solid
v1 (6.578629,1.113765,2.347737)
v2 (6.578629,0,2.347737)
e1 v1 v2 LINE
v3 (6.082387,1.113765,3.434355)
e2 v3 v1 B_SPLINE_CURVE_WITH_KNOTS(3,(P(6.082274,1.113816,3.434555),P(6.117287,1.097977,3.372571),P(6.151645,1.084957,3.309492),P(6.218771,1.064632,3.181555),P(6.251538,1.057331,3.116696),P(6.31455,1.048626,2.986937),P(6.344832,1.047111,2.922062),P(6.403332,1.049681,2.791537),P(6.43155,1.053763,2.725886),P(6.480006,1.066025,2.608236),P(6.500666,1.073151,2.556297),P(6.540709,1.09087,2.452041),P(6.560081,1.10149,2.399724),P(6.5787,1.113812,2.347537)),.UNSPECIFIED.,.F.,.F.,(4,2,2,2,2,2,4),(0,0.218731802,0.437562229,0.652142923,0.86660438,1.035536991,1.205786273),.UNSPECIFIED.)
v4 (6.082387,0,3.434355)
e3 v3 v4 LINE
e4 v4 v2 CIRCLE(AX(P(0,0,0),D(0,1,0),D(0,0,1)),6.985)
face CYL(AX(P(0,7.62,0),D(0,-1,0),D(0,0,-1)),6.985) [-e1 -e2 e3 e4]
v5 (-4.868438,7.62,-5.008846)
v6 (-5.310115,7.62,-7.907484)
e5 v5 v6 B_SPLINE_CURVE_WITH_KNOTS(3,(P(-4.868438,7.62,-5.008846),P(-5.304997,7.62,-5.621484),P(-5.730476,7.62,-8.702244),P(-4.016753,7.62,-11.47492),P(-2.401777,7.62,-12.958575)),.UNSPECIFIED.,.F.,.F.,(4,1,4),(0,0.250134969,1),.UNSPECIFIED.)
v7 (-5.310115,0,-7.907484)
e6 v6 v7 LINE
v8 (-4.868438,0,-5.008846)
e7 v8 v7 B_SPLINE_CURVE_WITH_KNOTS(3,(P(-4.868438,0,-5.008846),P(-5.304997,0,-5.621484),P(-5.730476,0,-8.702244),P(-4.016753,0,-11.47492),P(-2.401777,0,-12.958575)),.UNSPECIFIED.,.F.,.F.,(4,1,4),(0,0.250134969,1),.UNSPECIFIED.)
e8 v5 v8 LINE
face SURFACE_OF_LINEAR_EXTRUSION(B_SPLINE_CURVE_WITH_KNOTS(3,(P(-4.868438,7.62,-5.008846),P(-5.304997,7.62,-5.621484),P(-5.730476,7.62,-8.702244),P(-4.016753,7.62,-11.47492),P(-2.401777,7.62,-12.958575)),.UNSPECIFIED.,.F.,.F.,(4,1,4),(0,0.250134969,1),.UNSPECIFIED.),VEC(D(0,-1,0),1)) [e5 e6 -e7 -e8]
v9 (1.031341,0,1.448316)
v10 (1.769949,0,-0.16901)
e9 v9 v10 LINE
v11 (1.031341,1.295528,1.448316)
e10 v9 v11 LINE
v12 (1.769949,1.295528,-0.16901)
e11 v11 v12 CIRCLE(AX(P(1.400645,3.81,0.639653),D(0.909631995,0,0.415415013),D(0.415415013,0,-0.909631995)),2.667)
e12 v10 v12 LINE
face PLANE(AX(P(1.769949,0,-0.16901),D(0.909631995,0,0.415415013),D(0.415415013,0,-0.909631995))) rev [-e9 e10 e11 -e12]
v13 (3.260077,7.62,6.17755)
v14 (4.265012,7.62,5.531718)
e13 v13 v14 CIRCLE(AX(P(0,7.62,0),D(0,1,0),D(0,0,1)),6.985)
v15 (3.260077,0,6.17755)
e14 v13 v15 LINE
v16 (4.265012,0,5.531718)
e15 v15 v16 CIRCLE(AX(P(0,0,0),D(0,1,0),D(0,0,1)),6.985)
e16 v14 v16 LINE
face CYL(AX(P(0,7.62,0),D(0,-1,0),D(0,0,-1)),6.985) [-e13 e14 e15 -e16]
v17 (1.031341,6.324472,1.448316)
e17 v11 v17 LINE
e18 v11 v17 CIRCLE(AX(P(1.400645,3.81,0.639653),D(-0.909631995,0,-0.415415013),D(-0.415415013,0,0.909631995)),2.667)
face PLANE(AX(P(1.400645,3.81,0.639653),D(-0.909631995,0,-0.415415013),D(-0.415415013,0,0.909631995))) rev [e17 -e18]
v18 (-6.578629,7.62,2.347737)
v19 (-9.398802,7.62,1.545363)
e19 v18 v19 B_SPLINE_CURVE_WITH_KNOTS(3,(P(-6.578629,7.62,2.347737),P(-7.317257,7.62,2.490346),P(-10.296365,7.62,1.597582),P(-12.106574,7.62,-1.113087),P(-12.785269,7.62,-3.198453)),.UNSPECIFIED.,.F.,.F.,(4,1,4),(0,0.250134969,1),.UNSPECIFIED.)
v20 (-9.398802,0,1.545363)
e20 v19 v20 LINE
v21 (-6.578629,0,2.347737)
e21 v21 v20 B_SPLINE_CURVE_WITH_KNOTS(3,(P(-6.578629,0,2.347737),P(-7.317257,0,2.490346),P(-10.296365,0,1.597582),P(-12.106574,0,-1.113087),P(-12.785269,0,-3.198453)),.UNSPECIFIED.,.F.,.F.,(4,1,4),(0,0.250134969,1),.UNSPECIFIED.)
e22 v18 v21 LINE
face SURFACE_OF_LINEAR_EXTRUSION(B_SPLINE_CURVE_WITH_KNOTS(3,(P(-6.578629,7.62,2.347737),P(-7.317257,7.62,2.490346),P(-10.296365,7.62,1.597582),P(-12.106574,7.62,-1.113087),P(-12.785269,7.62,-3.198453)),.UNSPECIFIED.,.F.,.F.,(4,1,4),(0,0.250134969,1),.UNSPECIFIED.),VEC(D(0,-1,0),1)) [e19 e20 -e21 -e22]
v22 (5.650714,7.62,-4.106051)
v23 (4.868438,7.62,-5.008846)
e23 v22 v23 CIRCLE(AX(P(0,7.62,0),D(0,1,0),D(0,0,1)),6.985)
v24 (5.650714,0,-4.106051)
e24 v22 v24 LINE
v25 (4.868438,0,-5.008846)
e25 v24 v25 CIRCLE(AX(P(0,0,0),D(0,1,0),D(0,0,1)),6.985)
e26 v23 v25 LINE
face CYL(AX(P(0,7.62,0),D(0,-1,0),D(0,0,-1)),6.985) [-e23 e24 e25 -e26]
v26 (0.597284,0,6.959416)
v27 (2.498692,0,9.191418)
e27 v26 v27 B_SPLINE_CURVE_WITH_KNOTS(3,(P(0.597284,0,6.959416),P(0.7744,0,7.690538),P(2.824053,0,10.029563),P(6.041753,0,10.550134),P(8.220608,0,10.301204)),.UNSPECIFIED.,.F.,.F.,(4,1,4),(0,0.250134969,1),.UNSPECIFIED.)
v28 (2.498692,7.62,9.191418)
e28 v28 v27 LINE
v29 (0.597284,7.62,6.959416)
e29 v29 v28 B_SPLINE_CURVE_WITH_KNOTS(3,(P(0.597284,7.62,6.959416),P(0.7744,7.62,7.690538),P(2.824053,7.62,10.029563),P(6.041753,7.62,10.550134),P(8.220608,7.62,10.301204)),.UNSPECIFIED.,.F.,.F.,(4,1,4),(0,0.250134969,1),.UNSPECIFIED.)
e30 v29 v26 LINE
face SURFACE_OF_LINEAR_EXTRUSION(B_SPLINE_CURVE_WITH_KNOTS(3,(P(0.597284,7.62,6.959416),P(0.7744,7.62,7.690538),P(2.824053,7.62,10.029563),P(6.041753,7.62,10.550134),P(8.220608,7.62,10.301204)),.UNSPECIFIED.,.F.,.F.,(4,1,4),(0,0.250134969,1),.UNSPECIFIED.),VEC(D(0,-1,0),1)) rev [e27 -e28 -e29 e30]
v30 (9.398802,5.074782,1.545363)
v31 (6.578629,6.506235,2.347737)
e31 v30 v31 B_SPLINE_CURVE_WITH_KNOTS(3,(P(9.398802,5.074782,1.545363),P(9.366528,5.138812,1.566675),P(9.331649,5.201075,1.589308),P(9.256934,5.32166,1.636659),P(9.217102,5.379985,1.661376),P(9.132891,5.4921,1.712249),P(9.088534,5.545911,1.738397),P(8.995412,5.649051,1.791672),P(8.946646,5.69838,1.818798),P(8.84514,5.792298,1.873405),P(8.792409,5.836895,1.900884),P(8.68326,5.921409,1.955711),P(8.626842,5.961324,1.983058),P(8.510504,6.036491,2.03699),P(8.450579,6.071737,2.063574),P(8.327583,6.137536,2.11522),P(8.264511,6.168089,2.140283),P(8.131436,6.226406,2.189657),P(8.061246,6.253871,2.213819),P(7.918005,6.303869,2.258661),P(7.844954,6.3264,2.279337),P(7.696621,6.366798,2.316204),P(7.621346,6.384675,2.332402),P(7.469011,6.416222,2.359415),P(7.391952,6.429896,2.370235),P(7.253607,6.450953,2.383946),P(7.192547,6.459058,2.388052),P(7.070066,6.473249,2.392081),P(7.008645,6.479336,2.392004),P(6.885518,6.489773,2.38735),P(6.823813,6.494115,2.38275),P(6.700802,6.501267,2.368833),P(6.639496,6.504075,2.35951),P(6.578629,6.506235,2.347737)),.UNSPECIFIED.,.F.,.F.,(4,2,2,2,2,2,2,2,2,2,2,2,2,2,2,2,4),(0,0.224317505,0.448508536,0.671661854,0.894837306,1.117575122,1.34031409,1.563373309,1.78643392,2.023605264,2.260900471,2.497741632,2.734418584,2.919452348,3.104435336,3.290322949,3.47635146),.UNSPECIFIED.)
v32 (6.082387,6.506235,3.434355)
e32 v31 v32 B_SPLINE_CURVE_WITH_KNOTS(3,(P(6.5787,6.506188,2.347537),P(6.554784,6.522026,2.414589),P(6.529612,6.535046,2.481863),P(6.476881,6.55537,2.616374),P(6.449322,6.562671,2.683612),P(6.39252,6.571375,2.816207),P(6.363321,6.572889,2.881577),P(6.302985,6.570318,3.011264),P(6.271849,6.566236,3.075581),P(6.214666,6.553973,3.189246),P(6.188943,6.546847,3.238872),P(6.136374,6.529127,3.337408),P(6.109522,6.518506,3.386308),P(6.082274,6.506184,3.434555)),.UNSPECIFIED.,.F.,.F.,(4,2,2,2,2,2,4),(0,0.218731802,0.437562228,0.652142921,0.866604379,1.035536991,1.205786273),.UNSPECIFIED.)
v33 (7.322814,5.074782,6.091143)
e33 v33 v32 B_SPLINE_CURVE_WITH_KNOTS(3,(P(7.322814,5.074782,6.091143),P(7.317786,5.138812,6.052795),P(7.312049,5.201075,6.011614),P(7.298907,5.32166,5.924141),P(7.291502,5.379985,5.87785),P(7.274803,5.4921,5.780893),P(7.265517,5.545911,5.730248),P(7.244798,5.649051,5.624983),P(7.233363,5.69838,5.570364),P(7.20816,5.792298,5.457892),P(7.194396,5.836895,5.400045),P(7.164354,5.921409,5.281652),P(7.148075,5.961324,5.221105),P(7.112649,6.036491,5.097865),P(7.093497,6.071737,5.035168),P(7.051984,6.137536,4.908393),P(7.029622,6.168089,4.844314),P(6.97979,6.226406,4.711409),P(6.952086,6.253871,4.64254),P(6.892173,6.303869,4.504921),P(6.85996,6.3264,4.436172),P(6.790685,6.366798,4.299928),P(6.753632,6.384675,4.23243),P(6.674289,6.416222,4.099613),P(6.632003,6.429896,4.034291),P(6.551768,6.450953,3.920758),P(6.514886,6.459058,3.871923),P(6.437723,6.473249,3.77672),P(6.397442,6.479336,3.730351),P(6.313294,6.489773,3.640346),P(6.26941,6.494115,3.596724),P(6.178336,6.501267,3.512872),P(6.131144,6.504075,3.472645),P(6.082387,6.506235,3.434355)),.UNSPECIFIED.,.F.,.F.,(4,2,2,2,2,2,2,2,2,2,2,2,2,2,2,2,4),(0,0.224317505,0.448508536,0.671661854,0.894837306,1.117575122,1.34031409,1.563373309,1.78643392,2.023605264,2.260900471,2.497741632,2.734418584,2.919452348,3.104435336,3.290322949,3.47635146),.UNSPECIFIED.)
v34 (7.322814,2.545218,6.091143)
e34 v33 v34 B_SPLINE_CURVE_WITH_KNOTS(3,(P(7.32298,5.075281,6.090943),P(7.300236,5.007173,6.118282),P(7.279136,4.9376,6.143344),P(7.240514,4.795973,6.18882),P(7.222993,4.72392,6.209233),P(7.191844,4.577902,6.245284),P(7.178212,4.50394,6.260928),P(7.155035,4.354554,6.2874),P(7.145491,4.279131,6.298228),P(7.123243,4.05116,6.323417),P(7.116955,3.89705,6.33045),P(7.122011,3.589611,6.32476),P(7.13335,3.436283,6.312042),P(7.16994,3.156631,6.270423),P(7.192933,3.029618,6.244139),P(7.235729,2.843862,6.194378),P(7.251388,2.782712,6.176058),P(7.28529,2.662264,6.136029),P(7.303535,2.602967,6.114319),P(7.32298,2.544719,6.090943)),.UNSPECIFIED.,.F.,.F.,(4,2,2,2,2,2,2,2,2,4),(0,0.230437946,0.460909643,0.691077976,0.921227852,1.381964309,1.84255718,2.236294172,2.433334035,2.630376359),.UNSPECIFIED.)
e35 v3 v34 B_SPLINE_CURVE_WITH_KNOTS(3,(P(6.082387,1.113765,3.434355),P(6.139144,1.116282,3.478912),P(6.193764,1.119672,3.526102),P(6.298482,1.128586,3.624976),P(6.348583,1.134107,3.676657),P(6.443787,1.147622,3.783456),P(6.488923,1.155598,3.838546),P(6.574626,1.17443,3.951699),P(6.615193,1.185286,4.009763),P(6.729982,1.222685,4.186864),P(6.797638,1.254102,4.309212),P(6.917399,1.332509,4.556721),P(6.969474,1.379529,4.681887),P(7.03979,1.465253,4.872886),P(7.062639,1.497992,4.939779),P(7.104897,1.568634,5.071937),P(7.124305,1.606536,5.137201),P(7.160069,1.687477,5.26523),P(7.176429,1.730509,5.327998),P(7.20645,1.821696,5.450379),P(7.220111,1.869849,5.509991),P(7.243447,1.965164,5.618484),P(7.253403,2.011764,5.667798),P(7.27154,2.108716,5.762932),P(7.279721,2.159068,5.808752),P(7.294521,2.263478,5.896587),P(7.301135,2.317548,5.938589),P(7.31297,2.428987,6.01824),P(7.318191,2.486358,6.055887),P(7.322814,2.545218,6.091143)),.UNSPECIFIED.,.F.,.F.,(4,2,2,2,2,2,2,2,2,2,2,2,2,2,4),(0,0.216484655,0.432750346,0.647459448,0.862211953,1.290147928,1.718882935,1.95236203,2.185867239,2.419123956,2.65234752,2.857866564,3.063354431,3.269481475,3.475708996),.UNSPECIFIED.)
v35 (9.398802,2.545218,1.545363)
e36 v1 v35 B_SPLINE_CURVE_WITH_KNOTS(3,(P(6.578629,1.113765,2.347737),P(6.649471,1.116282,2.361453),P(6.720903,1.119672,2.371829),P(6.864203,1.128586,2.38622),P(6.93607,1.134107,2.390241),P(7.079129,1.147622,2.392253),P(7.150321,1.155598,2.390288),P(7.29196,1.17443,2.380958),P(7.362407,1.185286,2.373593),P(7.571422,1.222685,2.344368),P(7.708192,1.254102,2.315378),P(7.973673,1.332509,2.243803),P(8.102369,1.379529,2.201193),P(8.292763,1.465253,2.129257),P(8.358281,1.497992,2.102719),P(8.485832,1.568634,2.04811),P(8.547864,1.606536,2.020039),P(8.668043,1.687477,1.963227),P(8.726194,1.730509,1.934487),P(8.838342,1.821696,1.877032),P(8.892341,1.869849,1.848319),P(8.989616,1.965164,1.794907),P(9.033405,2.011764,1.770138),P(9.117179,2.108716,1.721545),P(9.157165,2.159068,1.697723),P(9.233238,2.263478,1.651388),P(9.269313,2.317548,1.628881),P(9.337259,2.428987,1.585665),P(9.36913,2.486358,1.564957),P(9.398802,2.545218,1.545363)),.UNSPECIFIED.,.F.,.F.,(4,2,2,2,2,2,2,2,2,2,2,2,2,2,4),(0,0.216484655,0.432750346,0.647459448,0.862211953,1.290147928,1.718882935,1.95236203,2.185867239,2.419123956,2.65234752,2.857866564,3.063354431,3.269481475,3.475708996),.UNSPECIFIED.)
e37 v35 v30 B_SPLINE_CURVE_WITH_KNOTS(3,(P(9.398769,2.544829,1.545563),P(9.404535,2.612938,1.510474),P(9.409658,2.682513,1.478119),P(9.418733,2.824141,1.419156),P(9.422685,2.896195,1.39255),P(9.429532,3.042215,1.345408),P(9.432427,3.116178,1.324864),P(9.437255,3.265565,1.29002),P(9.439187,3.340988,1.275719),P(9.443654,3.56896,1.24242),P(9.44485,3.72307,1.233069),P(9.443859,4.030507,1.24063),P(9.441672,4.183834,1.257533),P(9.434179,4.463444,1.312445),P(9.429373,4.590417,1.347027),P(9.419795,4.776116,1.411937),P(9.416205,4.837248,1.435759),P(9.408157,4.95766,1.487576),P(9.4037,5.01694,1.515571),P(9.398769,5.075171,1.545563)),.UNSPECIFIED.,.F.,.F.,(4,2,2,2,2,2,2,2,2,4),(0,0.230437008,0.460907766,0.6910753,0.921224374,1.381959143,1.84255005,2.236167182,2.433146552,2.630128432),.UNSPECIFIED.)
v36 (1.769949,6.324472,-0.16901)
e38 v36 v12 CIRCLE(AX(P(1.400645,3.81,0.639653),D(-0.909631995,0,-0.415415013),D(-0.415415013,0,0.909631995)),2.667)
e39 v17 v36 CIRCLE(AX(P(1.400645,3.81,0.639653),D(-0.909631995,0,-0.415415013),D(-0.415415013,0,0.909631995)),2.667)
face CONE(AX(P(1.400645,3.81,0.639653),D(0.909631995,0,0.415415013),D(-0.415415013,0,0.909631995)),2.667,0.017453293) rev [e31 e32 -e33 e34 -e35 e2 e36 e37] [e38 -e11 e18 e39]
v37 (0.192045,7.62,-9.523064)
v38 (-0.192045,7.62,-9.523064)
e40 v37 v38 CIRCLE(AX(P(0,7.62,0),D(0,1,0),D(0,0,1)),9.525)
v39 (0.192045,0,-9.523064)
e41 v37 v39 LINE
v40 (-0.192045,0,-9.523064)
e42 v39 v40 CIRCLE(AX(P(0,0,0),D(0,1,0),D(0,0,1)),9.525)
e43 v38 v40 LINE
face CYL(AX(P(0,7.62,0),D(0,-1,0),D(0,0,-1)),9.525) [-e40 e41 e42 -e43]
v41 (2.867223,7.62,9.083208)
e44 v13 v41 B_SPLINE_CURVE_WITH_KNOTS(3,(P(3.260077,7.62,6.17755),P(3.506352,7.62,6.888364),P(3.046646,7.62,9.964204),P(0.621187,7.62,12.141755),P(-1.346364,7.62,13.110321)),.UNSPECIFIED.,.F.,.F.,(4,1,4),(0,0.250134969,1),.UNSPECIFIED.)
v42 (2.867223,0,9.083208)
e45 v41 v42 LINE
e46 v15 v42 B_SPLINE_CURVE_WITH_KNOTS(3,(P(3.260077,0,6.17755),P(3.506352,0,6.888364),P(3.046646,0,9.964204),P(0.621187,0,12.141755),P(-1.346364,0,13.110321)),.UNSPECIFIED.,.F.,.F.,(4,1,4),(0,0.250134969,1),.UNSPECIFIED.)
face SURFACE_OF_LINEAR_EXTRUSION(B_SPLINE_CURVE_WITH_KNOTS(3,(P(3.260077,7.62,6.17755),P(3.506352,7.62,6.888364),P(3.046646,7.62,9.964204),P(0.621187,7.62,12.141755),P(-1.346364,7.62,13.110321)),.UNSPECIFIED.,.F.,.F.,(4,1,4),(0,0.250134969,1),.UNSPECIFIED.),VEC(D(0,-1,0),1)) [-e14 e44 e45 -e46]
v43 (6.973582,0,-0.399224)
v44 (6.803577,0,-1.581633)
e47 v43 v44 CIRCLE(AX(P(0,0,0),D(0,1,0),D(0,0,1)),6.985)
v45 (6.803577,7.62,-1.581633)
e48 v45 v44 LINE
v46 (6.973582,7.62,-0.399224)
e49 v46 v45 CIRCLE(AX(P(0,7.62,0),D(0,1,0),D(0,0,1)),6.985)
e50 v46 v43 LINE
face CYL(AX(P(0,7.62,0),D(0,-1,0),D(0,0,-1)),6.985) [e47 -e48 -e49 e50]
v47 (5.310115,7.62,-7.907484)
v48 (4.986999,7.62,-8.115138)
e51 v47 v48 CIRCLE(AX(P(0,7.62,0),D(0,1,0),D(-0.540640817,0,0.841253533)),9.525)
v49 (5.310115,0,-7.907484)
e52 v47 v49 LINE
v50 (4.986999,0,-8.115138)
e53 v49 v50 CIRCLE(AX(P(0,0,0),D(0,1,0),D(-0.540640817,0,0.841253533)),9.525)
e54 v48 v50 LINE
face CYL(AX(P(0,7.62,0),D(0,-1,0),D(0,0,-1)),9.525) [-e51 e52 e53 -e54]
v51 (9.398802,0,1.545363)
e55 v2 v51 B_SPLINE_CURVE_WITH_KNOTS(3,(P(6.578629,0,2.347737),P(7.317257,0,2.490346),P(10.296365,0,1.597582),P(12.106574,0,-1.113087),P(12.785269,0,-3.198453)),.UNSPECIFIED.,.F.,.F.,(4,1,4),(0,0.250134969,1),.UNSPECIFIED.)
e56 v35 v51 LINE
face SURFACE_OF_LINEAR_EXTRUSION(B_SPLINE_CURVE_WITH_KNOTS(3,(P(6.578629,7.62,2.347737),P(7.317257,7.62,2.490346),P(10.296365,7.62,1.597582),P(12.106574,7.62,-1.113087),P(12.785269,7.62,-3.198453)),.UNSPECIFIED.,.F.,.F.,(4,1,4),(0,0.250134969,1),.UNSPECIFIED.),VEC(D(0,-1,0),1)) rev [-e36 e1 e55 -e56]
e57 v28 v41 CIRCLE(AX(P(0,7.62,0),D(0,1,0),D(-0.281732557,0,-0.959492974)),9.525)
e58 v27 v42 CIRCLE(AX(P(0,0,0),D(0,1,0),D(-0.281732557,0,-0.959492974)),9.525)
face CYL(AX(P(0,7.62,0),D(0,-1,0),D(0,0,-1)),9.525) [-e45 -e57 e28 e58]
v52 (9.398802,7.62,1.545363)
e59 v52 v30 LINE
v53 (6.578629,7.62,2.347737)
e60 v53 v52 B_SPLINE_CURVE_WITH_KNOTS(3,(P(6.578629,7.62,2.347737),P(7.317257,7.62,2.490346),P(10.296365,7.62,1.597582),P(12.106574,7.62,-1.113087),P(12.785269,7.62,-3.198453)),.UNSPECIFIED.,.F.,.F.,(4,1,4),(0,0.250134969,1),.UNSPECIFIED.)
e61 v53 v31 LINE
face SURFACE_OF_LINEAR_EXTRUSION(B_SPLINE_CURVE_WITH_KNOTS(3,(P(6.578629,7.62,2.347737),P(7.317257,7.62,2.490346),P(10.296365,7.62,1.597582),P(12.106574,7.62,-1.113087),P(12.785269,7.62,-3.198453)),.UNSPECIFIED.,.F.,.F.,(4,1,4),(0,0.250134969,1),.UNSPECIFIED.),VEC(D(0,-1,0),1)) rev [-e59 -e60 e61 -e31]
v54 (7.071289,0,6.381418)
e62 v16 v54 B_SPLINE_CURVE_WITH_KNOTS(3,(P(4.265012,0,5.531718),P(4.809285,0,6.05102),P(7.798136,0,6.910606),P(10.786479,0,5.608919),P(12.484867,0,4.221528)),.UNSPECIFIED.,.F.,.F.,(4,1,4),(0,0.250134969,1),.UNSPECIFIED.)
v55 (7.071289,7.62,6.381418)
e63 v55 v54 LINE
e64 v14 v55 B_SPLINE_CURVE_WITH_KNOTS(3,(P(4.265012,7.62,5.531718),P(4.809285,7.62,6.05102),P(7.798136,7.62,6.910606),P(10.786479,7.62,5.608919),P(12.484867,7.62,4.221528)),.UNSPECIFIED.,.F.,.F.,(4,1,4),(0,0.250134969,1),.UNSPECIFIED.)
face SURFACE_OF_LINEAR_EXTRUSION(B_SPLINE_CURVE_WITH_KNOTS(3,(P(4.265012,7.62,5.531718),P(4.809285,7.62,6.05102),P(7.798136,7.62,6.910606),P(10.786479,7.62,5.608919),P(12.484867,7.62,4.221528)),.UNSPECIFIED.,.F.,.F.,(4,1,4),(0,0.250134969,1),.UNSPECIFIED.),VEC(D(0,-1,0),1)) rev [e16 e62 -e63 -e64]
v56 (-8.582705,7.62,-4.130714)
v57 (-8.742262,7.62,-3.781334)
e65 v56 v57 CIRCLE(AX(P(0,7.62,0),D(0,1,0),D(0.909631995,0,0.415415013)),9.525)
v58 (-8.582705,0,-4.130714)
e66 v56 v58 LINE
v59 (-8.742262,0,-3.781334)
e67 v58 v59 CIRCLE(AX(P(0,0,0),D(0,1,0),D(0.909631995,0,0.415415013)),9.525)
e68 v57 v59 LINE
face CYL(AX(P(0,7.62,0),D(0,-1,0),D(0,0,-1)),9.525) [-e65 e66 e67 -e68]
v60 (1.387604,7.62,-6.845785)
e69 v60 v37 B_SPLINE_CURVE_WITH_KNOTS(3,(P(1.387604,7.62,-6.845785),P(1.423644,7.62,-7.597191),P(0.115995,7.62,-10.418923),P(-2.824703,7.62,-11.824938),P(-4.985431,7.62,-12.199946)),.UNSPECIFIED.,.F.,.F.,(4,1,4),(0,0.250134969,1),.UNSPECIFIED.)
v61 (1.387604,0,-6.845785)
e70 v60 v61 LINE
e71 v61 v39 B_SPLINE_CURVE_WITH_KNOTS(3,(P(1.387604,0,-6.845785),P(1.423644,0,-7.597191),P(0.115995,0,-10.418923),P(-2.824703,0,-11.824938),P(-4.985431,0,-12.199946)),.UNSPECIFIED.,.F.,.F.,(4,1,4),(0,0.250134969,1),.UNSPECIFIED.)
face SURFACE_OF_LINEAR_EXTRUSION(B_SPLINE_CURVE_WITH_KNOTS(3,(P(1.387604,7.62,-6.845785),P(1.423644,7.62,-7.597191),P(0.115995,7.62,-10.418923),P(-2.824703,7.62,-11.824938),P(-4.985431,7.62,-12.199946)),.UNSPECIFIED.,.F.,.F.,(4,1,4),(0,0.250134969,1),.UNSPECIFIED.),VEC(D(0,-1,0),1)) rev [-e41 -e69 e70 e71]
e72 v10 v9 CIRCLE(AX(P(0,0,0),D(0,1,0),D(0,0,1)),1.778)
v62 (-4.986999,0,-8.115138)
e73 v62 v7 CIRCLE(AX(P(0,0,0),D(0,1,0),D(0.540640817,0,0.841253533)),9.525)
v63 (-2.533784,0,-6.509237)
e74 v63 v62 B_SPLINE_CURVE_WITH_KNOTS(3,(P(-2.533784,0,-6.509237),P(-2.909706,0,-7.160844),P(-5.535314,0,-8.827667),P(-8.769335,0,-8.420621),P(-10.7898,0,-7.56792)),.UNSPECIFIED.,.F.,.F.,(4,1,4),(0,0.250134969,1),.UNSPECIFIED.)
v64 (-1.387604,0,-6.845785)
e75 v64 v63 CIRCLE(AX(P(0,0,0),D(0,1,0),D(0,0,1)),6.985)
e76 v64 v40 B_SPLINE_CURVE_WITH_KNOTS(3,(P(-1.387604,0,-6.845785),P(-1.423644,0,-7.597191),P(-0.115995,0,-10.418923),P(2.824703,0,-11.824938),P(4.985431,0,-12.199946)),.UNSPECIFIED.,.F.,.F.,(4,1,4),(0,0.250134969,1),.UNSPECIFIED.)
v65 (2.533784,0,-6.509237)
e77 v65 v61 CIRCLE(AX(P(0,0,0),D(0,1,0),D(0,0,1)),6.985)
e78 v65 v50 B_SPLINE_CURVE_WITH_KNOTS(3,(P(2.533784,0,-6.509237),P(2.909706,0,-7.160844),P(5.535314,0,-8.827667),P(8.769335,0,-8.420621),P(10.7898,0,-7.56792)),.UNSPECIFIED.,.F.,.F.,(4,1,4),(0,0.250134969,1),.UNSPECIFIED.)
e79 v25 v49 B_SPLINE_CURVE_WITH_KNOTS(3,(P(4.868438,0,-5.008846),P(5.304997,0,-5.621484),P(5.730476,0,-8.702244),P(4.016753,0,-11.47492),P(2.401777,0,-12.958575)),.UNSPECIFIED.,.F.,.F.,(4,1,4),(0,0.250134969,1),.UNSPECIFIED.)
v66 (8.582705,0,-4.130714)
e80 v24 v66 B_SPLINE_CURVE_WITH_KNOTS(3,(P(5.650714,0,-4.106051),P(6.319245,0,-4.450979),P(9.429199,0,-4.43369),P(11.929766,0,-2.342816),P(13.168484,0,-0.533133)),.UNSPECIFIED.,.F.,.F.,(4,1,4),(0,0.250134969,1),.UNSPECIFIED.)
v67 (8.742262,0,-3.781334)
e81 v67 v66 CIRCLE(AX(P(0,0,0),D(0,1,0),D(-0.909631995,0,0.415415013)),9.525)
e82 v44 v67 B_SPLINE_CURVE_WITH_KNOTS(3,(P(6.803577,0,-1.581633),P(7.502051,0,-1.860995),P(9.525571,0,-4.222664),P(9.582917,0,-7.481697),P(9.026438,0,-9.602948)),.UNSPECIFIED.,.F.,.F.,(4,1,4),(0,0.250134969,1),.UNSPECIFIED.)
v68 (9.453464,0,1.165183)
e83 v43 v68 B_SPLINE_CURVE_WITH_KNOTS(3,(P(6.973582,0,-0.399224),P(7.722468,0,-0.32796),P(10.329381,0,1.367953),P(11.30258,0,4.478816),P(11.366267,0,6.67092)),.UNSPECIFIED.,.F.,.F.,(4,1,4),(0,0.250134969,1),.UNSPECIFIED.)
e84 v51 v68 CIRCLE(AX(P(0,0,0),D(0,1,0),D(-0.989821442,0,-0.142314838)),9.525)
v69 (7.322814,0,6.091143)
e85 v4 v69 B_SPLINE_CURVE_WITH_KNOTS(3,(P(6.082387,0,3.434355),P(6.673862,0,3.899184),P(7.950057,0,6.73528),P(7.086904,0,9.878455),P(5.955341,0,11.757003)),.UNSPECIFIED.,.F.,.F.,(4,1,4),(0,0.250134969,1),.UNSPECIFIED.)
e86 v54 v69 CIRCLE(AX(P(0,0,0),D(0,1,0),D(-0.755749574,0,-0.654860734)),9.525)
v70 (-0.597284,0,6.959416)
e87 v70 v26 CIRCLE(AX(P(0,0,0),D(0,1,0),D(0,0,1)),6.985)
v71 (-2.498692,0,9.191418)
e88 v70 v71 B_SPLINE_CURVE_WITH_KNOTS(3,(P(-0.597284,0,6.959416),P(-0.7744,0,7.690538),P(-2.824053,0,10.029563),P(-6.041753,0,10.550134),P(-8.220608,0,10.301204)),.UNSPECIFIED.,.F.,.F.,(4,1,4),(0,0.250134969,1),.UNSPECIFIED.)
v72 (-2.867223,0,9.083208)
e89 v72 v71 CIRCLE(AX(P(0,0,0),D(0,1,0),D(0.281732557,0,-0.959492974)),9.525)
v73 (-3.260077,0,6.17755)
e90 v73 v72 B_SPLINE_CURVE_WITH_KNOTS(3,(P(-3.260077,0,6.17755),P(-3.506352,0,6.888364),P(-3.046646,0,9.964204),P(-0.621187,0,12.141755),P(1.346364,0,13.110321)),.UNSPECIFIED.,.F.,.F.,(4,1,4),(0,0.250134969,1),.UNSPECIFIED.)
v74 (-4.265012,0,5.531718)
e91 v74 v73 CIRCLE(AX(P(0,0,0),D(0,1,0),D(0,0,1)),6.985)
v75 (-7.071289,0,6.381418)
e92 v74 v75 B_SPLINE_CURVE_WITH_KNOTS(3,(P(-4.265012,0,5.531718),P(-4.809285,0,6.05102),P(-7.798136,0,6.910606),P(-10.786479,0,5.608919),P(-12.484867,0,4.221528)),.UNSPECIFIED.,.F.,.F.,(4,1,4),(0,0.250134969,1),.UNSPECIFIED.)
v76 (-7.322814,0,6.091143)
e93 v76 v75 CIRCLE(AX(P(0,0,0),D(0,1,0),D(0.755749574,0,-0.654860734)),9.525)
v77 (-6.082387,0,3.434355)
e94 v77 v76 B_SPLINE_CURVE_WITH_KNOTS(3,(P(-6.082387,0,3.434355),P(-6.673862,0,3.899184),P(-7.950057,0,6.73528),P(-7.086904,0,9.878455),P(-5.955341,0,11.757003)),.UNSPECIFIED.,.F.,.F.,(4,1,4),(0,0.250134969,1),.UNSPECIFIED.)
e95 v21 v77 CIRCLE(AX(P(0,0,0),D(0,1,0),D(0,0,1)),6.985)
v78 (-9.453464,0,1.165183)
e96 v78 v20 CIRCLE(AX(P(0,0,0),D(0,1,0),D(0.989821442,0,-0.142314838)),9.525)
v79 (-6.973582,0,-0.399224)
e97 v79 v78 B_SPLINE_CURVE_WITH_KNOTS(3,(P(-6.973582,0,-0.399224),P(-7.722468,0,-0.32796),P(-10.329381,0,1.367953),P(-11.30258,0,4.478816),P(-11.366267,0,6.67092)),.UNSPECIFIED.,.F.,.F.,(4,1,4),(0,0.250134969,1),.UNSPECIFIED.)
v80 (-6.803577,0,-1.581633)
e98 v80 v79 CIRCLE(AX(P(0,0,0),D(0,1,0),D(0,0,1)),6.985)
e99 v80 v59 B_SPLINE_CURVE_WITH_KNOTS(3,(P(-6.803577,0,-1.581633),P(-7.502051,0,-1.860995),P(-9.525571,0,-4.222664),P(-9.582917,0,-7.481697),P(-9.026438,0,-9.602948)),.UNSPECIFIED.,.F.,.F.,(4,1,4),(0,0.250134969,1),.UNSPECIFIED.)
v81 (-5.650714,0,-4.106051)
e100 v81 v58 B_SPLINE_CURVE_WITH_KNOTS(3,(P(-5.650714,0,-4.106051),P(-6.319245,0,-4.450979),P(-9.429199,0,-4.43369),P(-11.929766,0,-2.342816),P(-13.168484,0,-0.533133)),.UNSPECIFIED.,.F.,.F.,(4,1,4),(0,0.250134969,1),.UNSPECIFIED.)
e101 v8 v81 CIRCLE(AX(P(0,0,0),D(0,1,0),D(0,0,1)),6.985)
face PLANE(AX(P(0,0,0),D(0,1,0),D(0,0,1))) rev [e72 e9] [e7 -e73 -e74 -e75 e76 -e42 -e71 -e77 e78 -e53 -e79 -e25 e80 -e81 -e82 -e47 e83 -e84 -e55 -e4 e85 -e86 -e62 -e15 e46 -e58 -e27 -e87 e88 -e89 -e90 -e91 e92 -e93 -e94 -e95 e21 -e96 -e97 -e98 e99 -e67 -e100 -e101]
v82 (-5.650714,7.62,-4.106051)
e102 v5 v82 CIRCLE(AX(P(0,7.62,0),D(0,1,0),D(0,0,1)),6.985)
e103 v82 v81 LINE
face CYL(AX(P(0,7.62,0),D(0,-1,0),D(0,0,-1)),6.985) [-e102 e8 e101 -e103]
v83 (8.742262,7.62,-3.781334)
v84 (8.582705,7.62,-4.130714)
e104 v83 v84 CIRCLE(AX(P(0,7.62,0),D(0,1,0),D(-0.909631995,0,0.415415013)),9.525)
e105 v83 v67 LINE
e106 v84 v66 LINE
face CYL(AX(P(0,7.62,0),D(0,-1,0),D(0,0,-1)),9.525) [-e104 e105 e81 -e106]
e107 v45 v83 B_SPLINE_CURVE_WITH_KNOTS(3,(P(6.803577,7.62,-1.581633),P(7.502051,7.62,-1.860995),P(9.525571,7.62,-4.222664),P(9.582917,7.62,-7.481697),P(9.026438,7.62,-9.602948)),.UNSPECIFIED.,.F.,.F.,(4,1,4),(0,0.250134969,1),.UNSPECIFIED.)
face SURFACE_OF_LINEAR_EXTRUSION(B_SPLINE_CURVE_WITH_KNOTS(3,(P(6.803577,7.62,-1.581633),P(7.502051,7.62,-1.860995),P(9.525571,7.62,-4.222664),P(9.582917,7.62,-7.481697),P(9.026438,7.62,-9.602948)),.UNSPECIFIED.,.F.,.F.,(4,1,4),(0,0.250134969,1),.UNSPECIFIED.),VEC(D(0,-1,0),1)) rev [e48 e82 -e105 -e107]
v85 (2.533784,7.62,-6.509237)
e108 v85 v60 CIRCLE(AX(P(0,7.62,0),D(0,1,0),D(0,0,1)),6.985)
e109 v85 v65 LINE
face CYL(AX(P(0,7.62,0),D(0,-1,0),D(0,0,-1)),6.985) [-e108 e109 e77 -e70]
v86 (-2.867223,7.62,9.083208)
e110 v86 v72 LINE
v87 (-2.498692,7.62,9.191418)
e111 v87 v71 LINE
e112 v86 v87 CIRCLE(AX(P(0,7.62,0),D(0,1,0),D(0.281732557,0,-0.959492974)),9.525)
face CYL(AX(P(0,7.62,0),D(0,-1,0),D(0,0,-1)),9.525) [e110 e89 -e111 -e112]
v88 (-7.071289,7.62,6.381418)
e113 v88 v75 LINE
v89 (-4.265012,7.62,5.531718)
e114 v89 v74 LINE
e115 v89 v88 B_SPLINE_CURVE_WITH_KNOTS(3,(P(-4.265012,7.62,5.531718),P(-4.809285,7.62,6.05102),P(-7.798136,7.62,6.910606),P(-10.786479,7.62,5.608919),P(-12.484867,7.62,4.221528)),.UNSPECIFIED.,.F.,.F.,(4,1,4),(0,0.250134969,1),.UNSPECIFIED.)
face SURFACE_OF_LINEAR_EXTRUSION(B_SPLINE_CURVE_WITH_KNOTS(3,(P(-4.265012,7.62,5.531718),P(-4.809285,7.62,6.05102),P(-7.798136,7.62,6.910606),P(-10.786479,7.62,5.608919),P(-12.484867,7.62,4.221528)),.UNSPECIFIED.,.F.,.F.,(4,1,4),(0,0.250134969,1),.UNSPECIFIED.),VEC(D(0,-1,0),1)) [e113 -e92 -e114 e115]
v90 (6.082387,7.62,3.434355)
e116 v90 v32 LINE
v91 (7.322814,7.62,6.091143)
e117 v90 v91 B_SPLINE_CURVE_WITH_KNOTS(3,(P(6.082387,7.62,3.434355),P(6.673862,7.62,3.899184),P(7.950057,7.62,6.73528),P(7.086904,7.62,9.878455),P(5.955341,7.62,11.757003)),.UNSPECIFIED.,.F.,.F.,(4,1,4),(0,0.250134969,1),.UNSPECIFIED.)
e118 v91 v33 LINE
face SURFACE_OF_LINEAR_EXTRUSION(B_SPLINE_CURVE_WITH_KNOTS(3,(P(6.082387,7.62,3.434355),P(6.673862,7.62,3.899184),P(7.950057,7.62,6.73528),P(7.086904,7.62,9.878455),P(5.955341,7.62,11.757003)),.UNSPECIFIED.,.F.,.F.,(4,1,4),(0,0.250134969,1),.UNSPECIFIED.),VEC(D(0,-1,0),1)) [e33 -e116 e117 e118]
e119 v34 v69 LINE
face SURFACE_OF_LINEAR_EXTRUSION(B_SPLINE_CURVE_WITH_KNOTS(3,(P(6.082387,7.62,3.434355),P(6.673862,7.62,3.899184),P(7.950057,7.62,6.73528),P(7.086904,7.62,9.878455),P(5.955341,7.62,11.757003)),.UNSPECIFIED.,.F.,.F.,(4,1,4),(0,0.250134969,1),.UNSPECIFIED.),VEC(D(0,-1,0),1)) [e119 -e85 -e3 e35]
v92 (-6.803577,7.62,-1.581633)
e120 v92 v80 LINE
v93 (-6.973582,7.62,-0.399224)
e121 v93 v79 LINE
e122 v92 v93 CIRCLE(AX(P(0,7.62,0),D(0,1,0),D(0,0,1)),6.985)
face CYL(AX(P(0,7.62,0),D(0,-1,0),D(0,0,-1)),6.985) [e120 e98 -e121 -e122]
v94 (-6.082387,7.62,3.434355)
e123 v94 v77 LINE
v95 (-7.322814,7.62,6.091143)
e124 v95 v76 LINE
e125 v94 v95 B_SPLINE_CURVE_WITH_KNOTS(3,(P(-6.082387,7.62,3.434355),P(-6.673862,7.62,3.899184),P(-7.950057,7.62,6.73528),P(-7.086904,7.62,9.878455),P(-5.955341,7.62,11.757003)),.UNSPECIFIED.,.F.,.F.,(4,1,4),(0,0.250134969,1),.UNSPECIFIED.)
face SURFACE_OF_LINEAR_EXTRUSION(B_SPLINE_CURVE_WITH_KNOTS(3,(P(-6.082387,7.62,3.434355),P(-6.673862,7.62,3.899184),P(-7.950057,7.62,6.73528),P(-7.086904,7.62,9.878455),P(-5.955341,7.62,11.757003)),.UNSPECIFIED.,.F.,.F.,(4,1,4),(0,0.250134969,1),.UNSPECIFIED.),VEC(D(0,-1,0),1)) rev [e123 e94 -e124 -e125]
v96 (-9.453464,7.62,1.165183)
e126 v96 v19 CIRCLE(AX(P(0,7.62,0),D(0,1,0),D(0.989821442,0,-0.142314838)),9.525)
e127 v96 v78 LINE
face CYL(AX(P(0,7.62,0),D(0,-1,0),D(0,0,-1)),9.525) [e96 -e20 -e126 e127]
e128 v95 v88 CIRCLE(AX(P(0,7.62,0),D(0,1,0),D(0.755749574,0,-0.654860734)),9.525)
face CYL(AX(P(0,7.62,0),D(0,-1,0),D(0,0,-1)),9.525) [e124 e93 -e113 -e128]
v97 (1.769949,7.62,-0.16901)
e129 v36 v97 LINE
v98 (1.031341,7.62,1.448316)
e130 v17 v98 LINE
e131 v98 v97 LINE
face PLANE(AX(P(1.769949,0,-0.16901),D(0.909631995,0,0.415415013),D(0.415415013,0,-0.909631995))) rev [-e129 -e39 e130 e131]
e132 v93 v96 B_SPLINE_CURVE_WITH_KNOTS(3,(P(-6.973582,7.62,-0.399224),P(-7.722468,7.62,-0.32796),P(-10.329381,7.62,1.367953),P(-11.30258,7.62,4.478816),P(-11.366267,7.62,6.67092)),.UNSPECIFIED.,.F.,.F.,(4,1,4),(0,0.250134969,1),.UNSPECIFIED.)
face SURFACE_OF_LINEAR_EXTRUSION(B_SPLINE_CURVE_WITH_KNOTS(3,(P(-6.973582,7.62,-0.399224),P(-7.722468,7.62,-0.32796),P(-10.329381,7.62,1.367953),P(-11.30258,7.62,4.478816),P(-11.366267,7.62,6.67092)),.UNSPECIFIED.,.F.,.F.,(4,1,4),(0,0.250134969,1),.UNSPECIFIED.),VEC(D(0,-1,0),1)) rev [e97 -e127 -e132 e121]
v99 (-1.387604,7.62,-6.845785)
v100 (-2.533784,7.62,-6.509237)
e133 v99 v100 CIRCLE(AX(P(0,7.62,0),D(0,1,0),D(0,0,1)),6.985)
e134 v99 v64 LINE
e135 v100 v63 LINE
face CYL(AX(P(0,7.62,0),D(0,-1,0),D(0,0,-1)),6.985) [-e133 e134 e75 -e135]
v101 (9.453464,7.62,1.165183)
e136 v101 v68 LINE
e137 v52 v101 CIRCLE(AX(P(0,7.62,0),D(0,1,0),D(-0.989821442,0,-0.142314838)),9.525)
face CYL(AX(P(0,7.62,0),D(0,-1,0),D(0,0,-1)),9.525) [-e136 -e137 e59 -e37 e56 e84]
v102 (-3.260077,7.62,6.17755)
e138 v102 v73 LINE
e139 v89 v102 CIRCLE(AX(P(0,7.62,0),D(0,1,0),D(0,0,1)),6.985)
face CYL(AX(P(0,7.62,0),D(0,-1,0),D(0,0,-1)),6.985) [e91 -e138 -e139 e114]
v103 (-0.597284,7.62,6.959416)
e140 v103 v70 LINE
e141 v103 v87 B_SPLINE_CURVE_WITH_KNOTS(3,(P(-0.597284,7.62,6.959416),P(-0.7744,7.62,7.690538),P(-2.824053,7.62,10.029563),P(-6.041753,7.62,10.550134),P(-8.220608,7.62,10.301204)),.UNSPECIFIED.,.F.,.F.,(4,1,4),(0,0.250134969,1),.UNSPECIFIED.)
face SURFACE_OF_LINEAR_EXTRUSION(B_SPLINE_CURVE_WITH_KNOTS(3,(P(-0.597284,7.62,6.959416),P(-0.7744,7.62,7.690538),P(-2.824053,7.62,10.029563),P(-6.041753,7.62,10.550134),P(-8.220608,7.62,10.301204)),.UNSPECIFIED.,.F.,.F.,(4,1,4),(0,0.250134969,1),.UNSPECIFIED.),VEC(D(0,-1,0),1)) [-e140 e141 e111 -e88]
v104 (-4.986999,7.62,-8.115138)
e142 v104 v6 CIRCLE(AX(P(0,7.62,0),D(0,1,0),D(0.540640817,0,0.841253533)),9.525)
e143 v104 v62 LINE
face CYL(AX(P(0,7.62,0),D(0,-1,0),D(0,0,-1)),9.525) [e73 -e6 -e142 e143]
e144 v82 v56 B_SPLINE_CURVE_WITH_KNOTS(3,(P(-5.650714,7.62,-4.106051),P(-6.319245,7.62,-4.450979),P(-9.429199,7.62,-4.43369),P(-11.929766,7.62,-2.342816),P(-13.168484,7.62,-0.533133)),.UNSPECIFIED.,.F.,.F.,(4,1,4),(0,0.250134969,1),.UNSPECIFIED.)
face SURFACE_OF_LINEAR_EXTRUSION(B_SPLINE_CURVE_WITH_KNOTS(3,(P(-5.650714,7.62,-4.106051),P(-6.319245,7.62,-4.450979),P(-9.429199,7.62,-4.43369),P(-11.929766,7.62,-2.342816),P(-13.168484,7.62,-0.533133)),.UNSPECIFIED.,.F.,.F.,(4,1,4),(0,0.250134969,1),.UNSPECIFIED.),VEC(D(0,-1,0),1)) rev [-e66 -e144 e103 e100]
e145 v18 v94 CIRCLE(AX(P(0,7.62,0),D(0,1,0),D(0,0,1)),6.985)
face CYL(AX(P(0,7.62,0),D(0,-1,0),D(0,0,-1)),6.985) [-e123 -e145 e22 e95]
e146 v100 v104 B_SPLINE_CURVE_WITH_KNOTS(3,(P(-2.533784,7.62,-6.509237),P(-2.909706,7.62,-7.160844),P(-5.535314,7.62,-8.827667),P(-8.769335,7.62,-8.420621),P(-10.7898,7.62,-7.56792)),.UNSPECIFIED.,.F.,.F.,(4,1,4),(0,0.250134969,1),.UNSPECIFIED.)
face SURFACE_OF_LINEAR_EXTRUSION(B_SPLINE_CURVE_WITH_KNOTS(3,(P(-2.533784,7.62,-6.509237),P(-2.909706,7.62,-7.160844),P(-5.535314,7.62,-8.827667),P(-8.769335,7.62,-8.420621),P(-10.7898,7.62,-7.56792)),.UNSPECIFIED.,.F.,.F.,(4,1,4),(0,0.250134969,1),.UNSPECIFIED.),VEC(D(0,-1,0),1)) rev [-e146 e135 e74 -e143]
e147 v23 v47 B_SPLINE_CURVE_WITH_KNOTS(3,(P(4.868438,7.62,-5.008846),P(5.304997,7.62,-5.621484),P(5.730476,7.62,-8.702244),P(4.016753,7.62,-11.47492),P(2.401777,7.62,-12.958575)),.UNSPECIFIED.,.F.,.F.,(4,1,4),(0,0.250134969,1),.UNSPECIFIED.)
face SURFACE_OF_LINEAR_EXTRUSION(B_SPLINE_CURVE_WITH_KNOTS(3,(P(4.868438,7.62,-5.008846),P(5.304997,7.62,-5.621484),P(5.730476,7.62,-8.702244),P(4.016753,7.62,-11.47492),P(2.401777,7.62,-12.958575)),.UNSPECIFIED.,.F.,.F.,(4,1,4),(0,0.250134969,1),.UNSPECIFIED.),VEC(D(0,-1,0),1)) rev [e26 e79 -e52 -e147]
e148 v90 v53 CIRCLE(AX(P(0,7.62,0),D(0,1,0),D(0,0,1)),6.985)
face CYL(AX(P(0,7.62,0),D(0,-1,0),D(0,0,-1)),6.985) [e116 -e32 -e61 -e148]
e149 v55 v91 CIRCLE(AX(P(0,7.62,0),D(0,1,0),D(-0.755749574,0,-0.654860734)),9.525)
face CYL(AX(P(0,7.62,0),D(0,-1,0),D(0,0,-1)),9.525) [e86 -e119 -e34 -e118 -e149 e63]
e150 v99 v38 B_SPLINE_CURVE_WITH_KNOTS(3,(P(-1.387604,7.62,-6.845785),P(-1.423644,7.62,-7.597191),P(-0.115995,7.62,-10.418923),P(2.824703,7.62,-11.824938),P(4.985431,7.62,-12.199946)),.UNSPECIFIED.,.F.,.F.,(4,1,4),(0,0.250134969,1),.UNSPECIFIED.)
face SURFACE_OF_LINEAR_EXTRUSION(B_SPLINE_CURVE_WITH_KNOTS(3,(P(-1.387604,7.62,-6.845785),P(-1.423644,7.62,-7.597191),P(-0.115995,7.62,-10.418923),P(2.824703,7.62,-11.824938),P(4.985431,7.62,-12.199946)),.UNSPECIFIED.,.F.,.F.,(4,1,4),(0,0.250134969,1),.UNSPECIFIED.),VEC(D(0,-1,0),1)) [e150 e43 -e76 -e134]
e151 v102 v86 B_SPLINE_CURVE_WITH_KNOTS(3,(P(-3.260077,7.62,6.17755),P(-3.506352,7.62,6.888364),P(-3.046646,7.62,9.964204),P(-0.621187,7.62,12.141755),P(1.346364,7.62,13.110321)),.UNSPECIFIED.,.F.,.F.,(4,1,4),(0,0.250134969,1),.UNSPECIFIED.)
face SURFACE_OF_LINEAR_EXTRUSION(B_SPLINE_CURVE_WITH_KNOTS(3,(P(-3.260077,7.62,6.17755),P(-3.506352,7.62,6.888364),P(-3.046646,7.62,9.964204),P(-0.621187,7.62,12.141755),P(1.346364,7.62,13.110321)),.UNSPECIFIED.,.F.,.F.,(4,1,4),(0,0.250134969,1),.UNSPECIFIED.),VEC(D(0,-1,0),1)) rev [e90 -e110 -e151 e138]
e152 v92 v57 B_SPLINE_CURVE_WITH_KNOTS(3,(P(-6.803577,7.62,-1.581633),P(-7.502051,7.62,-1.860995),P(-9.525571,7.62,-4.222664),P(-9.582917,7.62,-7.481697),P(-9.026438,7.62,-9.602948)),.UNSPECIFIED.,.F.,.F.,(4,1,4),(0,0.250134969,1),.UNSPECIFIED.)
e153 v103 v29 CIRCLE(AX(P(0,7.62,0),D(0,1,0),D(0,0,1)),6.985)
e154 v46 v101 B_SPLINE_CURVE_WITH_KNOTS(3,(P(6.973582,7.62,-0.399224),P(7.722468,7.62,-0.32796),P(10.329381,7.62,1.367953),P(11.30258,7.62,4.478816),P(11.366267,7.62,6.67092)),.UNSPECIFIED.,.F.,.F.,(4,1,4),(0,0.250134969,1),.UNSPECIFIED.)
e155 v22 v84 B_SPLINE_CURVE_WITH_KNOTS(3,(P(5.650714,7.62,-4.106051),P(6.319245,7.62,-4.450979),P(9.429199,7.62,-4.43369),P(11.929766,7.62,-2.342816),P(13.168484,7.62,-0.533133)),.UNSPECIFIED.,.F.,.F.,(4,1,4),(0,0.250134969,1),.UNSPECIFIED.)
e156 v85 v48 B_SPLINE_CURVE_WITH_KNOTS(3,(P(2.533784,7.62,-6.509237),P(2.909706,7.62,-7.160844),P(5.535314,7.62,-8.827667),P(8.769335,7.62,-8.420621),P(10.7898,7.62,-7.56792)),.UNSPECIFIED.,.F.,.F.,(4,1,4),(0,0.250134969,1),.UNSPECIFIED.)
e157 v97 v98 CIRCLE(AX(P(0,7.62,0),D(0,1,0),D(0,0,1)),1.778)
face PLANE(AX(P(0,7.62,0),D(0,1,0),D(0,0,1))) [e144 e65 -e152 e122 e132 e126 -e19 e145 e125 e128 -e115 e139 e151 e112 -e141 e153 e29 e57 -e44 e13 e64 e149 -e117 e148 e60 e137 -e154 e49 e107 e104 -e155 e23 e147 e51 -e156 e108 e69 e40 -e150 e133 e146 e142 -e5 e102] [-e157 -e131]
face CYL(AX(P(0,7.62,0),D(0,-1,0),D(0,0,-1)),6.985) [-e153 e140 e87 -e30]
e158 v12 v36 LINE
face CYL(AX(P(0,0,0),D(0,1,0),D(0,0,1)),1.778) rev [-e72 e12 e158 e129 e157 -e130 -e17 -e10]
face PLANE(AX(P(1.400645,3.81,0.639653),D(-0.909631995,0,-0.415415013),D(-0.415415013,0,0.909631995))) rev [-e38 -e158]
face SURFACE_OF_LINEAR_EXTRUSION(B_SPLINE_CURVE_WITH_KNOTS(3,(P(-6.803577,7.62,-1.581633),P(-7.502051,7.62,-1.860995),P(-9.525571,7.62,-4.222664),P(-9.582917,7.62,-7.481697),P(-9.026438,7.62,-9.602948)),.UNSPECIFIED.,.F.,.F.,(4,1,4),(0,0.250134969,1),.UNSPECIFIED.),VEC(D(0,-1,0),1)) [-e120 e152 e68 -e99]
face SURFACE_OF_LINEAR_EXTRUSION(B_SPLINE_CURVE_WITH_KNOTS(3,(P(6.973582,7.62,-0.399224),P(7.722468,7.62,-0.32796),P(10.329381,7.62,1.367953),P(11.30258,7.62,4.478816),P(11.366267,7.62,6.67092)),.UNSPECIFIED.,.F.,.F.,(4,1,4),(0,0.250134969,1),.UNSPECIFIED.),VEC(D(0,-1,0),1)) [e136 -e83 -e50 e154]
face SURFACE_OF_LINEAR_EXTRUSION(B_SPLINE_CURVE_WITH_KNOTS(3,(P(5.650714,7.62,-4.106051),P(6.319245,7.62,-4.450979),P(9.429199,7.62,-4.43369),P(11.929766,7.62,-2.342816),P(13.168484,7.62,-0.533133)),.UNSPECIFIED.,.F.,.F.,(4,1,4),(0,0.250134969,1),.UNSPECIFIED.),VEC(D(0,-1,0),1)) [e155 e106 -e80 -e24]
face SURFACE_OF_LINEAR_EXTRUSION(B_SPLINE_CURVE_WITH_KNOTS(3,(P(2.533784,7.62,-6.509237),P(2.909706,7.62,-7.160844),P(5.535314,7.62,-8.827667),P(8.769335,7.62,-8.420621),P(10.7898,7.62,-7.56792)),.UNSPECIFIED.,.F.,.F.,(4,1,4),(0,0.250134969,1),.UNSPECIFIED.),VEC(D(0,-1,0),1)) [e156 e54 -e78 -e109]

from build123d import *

# Parameters (mm, degrees)
SKETCH1_R           = 6.985
BOSS_EXTRUDE1_DEPTH = 7.62
CIRPATTERN1_COUNT   = 11
CUT_EXTRUDE1_DEPTH  = 16.43236868


# Read off the part's stored shape, not the designer's step: Cut-Extrude2
with BuildPart() as part:
    # Sketch1 → Boss-Extrude1 (new body)
    with BuildSketch(Plane(origin=(0, 0, 0), x_dir=(1, 0, 0), z_dir=(0, 1, 0))):
        Circle(SKETCH1_R)
        with BuildLine():
            add(Edge.make_bspline(
                [(1.387604422, 6.84578549), (1.423643939, 7.597190899), (0.984603354, 8.544581789), (0.361474483, 9.332383529), (0.192044664, 9.523063785)],
                knots=[0, 0, 0, 0, 0.250134969, 0.335748037, 0.335748037, 0.335748037, 0.335748037], degree=3))
            ThreePointArc((0.192044664, 9.523063785), (0, 9.525), (-0.192044664, 9.523063785))
            add(Edge.make_bspline(
                [(-1.387604422, 6.84578549), (-1.423643939, 7.597190899), (-0.984603354, 8.544581789), (-0.361474483, 9.332383529), (-0.192044664, 9.523063785)],
                knots=[0, 0, 0, 0, 0.250134969, 0.335748037, 0.335748037, 0.335748037, 0.335748037], degree=3))
            ThreePointArc((-1.387604422, 6.84578549), (0, 6.985), (1.387604422, 6.84578549))
        make_face()
    boss_extrude1 = extrude(amount=BOSS_EXTRUDE1_DEPTH)

    # CirPattern1: Boss-Extrude1 ×11 about axis
    cirpattern1_axis = Axis((0, 7.62, 0), (0, -1, 0))
    for i in range(1, CIRPATTERN1_COUNT):
        add(boss_extrude1.rotate(cirpattern1_axis, i * 360 / CIRPATTERN1_COUNT))

    # Sketch2 → Cut-Extrude1 (cut, through all)
    with BuildSketch(Plane(origin=(0, 7.62, 0), x_dir=(1, 0, 0), z_dir=(0, 1, 0))):
        with BuildLine():
            Line((1.769949078, 0.169009645), (1.031341185, -1.448316043))
            ThreePointArc((1.031341185, -1.448316043), (-1.617325688, 0.738607893), (1.769949078, 0.169009645))
        make_face()
    extrude(amount=-CUT_EXTRUDE1_DEPTH, mode=Mode.SUBTRACT)

    # Cut-Extrude2 outline → Cut-Extrude2 (revolve, cut)
    with BuildSketch(Plane(origin=(0, 3.81, 0), x_dir=(0, 1, 0), z_dir=(0.41541501300188993, 0, -0.9096319953545169))):
        Polygon((0, 1.539793168), (2.667, 1.539793168), (2.800559609, 9.191418023), (0, 9.191418023), align=None)
    revolve(axis=Axis((0, 3.81, 0), (0.9096319953545169, 0, 0.41541501300188993)), mode=Mode.SUBTRACT)


solid = part.part
